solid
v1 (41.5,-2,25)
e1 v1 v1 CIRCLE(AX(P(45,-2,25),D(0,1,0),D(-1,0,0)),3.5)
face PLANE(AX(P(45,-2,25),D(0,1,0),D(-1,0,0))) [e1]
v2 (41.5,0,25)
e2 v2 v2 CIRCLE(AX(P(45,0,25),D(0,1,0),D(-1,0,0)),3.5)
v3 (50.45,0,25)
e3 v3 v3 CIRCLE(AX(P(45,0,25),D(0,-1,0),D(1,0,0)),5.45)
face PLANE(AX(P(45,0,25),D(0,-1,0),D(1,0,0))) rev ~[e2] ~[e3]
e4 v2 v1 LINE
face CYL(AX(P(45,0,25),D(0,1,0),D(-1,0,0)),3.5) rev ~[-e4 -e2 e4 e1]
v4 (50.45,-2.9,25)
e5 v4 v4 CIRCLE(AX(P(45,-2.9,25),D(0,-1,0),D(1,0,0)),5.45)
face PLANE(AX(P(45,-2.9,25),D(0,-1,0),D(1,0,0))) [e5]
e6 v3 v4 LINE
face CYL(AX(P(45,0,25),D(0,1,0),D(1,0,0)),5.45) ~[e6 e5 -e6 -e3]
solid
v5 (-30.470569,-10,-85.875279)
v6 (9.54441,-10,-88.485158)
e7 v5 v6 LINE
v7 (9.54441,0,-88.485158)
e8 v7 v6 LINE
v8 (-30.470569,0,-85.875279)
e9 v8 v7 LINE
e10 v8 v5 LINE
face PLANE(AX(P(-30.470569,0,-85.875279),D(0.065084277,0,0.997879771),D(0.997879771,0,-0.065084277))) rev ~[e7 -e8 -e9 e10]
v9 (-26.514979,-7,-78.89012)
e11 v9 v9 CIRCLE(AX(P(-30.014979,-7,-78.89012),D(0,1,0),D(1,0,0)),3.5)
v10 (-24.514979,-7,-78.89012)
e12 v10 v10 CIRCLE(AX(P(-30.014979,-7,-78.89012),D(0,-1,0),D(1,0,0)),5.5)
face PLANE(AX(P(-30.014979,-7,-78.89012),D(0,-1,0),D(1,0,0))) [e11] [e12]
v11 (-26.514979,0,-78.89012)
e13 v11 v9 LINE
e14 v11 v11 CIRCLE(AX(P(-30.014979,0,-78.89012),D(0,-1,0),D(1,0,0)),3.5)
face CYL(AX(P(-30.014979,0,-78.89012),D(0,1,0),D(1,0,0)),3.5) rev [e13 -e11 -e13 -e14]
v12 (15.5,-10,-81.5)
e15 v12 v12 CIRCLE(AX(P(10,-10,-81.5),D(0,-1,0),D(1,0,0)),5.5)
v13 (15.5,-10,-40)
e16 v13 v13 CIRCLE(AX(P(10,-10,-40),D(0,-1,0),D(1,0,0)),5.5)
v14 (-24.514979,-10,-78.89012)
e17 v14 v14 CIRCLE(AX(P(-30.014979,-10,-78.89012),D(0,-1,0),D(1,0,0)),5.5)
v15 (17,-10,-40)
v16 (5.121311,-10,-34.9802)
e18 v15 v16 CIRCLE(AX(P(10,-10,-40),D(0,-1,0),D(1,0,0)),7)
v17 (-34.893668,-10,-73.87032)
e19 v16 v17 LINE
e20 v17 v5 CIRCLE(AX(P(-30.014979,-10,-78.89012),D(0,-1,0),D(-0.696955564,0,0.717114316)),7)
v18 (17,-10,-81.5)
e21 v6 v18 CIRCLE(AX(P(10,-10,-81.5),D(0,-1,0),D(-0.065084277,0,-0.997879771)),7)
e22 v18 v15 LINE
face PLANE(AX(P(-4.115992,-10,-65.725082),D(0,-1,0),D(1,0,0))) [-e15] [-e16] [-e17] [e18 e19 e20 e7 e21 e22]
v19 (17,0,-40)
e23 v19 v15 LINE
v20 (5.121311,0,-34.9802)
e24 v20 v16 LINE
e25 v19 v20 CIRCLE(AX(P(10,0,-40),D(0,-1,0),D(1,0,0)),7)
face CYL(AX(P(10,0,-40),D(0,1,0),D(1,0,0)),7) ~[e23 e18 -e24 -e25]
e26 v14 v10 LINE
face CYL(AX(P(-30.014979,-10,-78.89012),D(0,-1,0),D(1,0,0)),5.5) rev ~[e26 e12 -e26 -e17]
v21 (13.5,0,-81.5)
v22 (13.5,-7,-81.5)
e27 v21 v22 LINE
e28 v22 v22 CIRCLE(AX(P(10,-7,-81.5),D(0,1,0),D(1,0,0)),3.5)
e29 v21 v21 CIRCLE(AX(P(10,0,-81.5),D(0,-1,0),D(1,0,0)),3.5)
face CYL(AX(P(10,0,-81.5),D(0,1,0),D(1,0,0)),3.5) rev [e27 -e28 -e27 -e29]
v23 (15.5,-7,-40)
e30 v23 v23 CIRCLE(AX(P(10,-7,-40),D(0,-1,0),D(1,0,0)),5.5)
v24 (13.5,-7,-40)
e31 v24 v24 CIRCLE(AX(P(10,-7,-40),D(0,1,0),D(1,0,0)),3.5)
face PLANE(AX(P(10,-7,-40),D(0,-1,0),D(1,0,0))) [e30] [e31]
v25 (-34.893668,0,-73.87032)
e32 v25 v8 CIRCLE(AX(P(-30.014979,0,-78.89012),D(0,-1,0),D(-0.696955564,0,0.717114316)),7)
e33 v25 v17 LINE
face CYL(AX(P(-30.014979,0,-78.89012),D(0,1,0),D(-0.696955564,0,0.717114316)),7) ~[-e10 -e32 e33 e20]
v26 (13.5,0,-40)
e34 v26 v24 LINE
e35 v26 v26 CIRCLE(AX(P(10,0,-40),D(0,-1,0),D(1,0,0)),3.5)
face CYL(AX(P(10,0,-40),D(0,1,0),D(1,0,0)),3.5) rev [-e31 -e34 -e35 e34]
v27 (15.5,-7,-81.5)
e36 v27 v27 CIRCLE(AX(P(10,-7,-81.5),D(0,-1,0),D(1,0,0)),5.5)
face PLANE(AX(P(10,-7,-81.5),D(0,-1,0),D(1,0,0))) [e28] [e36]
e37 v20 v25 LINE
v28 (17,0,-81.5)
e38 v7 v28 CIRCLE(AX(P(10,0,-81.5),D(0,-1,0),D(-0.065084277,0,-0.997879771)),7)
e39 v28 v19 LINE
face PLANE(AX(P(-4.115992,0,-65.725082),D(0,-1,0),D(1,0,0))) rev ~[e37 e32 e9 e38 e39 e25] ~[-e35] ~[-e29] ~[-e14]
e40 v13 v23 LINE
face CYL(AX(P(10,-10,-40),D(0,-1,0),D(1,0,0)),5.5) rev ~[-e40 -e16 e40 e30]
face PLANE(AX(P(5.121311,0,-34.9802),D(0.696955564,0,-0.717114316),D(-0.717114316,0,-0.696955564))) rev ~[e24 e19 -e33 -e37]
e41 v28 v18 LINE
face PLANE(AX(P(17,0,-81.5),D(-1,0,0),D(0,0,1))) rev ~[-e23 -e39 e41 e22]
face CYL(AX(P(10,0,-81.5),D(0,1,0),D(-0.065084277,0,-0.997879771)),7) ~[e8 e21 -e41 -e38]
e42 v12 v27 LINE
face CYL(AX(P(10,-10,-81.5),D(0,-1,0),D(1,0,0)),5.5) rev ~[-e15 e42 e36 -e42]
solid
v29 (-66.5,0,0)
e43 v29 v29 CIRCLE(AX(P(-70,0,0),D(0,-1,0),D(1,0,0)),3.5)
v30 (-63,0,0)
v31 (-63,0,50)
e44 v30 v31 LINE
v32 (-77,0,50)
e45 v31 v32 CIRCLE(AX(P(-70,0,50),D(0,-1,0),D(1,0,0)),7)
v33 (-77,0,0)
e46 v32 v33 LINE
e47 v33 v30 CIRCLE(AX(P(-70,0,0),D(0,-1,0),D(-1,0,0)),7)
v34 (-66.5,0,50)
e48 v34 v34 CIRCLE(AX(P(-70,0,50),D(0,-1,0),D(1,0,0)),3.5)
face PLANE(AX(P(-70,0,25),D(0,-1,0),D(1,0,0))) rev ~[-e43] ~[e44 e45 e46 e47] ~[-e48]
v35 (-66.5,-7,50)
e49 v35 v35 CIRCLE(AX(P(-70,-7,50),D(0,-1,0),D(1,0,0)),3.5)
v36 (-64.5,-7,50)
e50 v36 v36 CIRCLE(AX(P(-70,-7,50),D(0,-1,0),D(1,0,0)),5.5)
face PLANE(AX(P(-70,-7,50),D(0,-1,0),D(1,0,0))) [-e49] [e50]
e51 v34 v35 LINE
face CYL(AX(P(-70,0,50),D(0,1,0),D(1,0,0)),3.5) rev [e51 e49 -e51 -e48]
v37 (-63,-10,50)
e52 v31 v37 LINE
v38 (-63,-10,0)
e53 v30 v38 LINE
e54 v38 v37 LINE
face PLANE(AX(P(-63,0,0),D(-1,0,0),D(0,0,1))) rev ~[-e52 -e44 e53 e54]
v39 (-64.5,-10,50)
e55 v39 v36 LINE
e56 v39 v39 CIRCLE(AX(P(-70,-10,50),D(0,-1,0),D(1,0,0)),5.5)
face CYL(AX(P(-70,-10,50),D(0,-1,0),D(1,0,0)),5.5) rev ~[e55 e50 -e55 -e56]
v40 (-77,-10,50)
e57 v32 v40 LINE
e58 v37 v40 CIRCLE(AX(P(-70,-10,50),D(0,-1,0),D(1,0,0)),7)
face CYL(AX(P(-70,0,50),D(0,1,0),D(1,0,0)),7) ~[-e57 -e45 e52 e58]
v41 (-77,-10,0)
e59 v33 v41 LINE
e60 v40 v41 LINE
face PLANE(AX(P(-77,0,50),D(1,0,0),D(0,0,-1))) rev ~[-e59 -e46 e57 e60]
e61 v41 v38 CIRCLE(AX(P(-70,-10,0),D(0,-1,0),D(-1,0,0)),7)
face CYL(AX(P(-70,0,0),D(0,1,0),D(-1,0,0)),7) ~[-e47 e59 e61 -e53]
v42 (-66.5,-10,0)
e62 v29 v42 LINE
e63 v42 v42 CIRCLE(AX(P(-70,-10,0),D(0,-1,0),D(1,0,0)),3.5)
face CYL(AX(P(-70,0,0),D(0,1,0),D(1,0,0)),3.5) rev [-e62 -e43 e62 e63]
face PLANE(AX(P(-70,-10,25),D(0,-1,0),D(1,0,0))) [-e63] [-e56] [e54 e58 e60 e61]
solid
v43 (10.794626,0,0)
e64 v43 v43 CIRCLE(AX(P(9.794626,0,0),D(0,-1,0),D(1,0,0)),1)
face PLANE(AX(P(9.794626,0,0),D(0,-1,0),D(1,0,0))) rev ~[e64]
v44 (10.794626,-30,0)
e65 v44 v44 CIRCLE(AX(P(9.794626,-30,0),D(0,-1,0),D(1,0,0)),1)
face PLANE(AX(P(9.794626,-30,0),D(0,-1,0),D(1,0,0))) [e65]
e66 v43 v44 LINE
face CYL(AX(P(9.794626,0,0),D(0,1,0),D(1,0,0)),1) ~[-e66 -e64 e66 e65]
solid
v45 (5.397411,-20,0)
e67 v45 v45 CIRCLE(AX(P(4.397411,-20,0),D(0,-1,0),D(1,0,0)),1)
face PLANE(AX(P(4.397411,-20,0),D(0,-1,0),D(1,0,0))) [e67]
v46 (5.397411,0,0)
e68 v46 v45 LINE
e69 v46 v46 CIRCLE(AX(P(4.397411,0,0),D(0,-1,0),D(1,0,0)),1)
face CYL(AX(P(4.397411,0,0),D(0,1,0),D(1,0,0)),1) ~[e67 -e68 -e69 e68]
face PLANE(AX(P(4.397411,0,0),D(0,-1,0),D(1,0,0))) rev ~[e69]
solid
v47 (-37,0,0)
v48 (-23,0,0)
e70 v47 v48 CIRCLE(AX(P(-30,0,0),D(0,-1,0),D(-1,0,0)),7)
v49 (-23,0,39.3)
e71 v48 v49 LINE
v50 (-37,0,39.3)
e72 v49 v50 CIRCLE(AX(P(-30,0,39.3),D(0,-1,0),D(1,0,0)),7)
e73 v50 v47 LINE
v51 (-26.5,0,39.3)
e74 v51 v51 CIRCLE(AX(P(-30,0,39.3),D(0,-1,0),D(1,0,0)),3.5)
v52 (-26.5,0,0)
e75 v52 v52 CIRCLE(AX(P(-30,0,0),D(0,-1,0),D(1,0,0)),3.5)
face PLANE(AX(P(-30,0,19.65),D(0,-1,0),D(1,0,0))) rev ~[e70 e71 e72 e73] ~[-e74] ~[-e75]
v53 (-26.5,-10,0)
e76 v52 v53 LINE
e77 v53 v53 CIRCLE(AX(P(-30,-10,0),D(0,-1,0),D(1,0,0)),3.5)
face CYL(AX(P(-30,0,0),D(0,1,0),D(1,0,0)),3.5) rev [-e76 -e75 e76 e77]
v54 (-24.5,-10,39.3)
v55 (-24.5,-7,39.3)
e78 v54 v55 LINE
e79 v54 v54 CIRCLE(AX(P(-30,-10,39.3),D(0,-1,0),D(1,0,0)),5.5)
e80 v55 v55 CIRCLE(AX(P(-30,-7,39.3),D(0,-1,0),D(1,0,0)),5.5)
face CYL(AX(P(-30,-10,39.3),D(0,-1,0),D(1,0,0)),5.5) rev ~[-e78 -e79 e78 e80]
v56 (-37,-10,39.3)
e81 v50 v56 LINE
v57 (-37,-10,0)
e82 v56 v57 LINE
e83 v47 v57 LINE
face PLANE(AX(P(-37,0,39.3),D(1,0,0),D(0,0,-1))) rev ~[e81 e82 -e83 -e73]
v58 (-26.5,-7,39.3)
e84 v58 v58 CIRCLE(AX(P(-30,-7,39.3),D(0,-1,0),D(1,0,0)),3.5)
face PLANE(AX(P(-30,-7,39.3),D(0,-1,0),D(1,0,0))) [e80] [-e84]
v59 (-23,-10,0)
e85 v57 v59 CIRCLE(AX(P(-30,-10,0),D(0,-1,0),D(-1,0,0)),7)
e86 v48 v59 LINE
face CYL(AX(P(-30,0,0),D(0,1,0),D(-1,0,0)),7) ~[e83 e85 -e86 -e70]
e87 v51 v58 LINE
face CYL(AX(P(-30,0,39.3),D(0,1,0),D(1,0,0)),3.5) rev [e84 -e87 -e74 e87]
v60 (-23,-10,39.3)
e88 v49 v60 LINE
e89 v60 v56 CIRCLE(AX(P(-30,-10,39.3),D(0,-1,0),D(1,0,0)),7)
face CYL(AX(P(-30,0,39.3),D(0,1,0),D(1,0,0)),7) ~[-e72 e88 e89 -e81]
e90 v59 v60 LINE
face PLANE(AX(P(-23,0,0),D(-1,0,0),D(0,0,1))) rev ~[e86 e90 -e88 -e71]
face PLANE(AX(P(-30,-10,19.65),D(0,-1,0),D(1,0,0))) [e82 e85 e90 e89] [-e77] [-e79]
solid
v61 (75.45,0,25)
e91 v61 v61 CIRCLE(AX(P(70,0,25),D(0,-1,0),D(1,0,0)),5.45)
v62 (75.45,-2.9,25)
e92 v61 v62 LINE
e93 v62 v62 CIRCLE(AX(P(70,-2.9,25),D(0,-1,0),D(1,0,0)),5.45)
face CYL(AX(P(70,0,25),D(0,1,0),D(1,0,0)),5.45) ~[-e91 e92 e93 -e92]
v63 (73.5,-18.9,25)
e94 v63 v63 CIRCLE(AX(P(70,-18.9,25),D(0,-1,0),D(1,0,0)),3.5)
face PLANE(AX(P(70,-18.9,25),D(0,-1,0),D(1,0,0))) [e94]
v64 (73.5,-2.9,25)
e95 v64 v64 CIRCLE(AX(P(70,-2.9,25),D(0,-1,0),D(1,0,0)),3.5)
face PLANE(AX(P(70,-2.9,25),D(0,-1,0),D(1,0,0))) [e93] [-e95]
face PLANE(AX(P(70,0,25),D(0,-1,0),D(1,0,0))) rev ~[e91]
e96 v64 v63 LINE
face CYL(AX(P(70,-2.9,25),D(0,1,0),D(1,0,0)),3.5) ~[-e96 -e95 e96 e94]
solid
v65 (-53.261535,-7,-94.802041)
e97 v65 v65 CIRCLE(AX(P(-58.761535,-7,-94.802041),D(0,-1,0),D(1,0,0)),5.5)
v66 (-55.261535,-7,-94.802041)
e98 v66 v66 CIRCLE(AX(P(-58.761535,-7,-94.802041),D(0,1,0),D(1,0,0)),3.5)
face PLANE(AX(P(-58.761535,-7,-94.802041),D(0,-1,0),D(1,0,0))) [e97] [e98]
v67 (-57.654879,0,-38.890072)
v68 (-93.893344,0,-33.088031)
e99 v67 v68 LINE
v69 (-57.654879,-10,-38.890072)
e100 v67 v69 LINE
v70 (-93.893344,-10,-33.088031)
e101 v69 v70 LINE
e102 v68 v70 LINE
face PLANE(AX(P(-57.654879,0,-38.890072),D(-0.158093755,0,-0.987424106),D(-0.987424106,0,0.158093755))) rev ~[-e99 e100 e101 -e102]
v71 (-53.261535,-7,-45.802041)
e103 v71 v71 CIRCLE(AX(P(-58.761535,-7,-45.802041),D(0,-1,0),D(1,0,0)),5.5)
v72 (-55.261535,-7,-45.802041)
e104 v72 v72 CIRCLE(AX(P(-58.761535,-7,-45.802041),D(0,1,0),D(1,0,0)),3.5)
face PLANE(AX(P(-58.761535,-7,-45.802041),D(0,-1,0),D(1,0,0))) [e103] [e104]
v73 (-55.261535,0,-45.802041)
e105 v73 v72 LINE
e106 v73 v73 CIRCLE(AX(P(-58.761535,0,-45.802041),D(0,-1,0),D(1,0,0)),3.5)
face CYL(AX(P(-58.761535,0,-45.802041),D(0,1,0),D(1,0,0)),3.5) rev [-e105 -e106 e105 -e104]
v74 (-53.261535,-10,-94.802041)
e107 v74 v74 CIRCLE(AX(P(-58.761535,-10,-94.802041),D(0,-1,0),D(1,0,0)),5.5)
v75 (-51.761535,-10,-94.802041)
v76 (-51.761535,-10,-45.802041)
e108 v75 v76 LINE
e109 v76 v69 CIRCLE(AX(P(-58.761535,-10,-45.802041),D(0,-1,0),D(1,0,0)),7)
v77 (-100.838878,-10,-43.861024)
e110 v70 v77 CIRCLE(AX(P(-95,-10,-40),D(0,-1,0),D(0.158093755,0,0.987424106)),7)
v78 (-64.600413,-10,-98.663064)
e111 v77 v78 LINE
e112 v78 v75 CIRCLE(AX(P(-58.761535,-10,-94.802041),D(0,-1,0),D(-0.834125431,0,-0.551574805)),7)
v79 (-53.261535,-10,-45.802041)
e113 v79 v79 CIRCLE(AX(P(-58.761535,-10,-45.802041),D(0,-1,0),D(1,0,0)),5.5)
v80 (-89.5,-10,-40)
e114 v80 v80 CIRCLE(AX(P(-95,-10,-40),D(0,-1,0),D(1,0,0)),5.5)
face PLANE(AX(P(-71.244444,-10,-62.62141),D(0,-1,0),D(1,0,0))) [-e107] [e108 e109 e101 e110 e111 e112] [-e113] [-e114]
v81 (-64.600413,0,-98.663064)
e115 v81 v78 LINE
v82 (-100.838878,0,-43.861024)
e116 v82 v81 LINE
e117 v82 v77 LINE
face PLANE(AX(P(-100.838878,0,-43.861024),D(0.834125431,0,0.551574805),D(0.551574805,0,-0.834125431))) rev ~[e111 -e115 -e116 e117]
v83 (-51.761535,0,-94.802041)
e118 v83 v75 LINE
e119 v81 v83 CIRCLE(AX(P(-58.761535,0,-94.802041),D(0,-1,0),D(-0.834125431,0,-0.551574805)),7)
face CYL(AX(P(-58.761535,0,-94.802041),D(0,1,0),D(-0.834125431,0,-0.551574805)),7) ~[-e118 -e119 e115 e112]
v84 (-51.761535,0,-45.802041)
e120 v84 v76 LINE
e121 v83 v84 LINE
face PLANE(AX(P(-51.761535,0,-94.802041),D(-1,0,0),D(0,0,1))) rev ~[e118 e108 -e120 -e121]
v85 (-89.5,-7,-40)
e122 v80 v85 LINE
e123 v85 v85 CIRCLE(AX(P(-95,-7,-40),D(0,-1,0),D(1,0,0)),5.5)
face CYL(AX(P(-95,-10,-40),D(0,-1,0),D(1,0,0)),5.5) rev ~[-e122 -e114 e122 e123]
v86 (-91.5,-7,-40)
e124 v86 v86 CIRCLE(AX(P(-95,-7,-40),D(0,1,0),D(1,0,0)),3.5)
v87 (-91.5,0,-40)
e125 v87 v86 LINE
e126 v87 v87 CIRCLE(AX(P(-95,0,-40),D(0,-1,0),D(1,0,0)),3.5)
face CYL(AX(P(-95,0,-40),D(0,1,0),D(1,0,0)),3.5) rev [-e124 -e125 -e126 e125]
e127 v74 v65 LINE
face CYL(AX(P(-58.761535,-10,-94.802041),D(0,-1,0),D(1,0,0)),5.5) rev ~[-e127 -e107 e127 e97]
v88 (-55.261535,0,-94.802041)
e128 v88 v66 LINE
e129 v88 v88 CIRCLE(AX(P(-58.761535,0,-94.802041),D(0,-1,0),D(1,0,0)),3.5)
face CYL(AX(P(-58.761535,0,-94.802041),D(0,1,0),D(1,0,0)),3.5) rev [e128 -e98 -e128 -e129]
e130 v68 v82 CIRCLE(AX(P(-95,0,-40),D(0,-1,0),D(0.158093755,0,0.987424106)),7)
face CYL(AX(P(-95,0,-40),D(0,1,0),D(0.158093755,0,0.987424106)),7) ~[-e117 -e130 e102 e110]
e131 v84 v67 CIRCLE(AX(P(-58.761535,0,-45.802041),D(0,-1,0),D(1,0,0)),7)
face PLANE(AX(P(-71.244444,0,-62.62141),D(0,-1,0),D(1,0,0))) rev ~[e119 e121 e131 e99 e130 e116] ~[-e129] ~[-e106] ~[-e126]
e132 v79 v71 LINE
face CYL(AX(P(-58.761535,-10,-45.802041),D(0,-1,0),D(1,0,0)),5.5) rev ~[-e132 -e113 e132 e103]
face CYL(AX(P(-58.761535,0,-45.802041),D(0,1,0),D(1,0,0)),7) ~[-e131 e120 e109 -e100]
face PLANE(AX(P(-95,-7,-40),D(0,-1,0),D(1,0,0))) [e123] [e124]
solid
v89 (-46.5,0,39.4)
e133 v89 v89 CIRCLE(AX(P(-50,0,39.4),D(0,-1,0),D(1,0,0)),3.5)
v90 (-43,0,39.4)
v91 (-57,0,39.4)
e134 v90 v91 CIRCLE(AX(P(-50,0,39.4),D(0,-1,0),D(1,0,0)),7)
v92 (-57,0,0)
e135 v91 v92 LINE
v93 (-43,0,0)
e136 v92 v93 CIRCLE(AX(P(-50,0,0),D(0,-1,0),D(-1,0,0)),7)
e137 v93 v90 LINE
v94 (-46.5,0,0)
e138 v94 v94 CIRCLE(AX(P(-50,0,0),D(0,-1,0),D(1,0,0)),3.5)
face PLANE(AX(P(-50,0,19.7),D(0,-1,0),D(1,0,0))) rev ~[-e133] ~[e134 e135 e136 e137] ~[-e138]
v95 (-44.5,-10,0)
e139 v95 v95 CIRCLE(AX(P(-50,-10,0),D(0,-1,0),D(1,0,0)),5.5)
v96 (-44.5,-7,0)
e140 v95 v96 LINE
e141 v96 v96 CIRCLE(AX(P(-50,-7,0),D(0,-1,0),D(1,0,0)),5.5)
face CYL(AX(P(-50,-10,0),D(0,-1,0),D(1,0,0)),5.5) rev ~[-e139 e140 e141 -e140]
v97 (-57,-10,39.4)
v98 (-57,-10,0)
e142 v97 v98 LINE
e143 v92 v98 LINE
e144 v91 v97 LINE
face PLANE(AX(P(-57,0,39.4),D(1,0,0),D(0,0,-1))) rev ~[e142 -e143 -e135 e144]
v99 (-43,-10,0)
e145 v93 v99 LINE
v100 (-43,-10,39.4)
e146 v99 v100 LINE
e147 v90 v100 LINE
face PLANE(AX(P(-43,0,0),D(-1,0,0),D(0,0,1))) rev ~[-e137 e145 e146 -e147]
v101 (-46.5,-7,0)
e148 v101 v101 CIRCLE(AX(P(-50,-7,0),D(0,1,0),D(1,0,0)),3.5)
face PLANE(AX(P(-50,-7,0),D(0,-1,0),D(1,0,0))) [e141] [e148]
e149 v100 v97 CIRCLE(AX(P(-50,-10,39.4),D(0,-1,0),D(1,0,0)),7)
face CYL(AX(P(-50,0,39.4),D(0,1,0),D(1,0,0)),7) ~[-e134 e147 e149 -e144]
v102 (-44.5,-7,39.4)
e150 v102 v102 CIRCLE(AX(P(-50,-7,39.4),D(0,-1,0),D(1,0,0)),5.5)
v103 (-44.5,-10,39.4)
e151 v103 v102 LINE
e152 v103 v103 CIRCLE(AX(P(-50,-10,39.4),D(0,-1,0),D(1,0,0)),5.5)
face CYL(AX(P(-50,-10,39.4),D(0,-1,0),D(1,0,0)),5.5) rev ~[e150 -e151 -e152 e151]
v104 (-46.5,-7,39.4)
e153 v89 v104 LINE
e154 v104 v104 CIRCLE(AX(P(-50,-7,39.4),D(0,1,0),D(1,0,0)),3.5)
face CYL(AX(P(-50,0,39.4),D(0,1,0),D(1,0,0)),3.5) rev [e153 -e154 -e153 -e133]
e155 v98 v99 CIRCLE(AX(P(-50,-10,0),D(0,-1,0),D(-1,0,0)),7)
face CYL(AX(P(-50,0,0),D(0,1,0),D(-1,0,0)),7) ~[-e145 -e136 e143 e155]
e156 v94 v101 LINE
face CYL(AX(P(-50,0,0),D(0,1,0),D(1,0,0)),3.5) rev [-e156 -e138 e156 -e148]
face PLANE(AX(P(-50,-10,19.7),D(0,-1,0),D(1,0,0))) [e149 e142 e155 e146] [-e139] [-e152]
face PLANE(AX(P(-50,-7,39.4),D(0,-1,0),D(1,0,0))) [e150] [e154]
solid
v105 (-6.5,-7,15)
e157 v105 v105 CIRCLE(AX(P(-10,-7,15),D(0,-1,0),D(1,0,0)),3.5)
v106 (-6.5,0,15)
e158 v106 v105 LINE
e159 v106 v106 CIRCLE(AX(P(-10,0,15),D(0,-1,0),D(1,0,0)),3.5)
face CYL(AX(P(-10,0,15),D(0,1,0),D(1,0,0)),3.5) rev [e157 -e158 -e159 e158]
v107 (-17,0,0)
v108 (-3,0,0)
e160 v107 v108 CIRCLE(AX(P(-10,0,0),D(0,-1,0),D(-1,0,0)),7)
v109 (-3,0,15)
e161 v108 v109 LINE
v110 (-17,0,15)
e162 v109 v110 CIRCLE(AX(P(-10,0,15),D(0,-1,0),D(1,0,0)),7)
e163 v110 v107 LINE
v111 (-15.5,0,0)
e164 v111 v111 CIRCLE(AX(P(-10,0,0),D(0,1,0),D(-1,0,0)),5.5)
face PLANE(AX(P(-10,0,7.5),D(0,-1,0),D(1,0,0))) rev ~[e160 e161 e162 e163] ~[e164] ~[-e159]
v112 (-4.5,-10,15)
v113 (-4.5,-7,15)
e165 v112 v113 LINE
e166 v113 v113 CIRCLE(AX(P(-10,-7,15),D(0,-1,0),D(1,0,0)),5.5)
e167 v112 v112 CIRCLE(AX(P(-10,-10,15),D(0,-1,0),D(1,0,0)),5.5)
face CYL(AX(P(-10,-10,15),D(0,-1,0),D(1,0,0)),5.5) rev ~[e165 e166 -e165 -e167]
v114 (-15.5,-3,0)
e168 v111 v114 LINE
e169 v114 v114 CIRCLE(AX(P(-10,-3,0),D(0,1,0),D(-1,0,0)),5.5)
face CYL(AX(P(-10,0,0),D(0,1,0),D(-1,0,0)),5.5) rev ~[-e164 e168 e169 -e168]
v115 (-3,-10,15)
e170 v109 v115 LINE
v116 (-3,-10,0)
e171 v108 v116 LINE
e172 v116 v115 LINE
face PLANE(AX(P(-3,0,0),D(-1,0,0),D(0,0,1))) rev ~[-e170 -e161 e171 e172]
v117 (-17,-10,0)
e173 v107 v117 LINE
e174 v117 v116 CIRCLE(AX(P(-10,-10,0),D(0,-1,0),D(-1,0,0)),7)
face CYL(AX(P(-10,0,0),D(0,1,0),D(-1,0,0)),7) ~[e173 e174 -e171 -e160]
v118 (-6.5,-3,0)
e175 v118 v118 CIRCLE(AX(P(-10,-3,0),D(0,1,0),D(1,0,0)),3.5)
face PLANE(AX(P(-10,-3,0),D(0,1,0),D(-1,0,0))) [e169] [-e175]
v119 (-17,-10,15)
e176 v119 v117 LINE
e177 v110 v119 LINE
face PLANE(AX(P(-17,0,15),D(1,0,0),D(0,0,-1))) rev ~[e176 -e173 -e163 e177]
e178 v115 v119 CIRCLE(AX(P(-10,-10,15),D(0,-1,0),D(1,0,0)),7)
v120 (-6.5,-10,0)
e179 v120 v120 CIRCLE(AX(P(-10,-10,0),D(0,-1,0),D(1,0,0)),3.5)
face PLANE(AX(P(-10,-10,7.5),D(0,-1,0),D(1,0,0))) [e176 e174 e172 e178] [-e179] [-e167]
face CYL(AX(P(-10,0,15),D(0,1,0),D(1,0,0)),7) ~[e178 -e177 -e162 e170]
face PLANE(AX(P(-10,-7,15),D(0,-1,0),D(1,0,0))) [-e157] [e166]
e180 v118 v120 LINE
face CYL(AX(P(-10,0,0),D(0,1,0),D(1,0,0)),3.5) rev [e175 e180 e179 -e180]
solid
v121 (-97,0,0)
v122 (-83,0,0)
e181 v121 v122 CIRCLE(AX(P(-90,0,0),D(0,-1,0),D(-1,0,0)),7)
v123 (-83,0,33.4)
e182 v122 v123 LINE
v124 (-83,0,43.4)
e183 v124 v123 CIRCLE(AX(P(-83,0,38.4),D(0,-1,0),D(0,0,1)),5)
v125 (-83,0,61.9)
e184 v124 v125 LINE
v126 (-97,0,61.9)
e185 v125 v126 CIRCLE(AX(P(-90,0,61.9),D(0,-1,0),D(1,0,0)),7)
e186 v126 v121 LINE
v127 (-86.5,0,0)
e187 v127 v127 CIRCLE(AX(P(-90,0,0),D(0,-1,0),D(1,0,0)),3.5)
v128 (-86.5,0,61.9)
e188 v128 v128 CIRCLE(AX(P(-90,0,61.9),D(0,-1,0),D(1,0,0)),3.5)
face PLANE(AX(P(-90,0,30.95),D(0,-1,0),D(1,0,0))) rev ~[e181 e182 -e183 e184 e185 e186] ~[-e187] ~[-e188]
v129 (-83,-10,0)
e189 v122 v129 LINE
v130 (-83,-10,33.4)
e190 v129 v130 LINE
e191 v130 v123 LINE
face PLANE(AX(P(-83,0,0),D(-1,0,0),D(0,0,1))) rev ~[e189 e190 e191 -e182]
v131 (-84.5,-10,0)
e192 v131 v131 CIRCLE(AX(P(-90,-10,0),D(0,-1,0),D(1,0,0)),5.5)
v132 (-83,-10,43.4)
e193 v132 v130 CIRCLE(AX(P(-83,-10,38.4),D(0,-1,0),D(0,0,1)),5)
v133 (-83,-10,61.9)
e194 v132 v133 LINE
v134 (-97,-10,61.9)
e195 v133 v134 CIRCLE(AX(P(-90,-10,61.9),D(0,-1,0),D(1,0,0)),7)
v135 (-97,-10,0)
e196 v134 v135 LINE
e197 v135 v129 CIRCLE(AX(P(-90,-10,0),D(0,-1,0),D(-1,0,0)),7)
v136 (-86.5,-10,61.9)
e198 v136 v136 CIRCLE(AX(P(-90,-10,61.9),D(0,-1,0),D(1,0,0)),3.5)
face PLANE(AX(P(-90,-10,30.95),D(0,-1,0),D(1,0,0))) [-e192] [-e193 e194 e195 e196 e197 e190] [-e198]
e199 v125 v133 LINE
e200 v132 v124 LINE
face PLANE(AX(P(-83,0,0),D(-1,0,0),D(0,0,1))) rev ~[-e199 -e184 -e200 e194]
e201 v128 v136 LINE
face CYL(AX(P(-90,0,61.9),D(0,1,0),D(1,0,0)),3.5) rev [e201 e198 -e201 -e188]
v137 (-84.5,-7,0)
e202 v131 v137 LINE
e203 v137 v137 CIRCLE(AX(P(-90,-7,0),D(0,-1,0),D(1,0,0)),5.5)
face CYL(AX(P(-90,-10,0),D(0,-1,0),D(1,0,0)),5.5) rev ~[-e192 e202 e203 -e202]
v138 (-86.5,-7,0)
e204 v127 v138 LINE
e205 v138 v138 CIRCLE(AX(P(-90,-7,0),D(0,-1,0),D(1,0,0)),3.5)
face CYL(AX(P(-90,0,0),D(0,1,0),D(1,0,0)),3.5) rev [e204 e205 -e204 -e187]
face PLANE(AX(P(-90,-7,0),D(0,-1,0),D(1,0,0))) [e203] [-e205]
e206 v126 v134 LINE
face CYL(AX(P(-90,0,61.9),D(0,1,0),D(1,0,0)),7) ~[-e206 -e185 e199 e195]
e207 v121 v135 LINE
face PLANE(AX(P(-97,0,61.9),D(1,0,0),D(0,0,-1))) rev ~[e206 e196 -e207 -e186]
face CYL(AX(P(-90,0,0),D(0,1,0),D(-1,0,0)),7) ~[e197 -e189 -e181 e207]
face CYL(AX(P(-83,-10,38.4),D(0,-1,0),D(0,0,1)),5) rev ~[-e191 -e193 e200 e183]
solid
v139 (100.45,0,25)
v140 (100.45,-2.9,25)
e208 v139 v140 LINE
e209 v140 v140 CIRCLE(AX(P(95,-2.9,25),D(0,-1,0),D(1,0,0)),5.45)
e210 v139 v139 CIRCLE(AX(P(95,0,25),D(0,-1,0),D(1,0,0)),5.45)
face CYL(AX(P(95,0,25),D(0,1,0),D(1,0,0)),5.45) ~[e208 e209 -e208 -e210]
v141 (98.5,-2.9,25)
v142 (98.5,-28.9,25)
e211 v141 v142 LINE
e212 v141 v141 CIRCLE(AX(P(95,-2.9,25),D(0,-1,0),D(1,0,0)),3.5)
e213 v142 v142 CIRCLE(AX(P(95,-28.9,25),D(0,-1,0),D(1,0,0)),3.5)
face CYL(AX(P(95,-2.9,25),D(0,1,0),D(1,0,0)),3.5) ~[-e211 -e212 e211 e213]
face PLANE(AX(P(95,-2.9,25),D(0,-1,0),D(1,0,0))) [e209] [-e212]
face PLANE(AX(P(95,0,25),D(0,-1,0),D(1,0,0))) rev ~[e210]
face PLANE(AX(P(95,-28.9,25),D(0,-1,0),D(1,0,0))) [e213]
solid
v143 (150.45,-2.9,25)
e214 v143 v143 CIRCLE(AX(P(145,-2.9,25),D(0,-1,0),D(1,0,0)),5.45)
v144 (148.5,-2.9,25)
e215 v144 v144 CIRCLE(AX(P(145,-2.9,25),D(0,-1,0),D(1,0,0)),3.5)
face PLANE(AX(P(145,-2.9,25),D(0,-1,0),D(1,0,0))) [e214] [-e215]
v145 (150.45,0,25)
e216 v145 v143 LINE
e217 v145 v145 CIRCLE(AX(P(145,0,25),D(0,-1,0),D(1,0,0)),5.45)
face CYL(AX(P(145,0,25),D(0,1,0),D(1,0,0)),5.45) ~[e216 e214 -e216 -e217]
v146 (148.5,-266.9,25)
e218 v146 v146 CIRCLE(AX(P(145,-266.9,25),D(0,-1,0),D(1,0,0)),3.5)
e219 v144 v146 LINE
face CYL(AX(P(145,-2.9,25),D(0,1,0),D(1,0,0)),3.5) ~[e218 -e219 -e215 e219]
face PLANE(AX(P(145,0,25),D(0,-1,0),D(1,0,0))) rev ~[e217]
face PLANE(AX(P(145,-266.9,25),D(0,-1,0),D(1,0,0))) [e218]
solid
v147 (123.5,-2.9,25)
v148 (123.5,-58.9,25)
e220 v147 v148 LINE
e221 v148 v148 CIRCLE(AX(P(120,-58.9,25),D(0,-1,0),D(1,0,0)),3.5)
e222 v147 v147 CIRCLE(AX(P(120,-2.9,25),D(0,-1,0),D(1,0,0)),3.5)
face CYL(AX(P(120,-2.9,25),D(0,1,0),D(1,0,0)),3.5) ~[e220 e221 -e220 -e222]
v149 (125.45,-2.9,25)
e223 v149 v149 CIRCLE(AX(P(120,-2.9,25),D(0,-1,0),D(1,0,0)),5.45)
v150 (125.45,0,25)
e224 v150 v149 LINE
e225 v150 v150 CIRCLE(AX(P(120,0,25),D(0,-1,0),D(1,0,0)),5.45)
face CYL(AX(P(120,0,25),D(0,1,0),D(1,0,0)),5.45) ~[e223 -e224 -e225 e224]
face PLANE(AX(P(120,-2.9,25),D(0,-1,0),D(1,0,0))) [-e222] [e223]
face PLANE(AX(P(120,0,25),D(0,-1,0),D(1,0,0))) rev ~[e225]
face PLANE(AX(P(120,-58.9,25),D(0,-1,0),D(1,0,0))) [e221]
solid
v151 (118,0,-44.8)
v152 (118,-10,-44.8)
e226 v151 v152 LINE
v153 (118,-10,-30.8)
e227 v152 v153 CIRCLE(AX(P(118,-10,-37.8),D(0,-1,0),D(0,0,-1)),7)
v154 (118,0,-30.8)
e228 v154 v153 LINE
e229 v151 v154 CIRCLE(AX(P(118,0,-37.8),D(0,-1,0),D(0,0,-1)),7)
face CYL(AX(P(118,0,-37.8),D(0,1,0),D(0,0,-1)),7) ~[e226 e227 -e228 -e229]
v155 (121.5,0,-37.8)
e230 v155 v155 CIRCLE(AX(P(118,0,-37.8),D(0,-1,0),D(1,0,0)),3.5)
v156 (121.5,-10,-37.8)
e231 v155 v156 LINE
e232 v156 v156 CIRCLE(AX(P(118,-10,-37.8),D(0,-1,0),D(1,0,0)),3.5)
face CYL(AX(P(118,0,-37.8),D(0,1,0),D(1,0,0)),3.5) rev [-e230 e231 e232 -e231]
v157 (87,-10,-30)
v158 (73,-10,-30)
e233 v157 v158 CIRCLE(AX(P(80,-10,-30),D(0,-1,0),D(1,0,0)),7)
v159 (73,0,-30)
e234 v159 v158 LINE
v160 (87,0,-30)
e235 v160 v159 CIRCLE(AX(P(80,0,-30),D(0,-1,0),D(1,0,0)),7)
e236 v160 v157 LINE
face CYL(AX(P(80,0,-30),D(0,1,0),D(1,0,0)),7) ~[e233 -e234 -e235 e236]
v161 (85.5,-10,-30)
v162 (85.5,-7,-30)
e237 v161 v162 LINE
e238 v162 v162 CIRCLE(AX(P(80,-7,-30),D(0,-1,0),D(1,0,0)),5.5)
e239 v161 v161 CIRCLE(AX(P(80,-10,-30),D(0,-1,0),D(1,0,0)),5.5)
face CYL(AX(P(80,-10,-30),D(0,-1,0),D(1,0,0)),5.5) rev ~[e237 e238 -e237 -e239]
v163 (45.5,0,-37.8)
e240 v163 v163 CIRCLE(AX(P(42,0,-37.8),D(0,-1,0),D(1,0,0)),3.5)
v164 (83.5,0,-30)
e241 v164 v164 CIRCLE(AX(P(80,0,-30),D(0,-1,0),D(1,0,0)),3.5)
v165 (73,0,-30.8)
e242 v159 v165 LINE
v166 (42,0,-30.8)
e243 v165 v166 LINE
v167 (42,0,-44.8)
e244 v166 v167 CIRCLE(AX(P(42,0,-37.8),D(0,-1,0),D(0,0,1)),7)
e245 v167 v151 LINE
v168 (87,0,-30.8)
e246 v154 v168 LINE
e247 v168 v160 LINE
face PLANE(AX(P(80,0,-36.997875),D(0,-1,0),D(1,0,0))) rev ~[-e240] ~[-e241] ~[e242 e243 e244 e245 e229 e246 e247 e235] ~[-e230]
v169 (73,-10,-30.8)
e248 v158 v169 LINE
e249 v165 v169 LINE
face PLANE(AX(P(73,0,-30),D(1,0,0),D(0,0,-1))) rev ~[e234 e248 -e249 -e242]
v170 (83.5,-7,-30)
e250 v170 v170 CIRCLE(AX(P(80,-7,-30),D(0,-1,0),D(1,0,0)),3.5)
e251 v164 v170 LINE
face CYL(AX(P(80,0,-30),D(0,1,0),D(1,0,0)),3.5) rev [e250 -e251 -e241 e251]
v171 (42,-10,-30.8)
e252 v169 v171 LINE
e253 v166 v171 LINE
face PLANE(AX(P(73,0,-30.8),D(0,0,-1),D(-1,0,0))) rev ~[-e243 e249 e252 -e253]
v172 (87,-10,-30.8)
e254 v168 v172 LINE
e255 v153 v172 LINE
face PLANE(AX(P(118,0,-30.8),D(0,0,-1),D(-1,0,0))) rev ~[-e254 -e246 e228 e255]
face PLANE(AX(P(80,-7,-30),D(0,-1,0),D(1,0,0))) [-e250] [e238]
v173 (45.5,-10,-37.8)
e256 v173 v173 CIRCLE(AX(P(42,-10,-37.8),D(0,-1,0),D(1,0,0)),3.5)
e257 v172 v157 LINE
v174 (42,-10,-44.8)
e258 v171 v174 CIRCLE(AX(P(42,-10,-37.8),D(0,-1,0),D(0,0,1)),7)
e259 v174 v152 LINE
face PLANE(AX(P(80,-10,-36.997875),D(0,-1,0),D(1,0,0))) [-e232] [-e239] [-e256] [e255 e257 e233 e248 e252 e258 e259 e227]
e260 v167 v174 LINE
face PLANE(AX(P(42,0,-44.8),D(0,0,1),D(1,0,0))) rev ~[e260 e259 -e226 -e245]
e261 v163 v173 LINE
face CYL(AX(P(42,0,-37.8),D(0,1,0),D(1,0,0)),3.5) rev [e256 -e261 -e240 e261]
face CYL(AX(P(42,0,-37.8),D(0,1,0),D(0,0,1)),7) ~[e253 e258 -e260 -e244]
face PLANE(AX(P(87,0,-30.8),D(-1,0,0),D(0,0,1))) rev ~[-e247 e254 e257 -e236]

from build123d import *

# Parameters (mm, degrees)
F1_R      = 3.5
F2_DEPTH  = 10
F3_R      = 1
F4_DEPTH  = 20
F5_DEPTH  = 30
F7_DEPTH  = 10
F10_R     = 5.5
F10_R_2   = 3.5
F11_DEPTH = 3
F12_R     = 5.5
F12_R_2   = 3.5
F13_DEPTH = 3
F14_R     = 5.5
F14_R_2   = 3.5
F15_DEPTH = 3
F16_R     = 5.5
F17_DEPTH = 3
F18_R     = 5.5
F19_DEPTH = 3
F20_R     = 5.5
F20_R_2   = 3.5
F21_DEPTH = 3
F22_R     = 5.5
F23_DEPTH = 3
F24_R     = 5.45
F25_DEPTH = 2.9
F26_R     = 3.5
F27_DEPTH = 16
F28_DEPTH = 26
F29_DEPTH = 56
F30_DEPTH = 264
F31_R     = 5.5
F31_R_2   = 3.5
F32_DEPTH = 3
F33_R     = 5.5
F33_R_2   = 3.5
F34_DEPTH = 3
F35_R     = 3.5
F36_DEPTH = 2


# Not quite as in the source:
# - a feature names something its author has since deleted; it is built from what else it names


with BuildPart() as f2:
    # F1 (on Front) → F2 (new body)
    with BuildSketch(Plane.XZ):
        with BuildLine():
            Line((17, -81.5), (17, -40))
            ThreePointArc((17, -40), (12.7248098424, -33.5521002394), (5.1213110507, -34.9801997913))
            Line((5.1213110507, -34.9801997913), (-34.8936677561, -73.8703202732))
            ThreePointArc((-34.8936677561, -73.8703202732), (-36.5833416613, -81.3101637481), (-30.4705687475, -85.8752788771))
            Line((-30.4705687475, -85.8752788771), (9.5444100592, -88.4851583952))
            ThreePointArc((9.5444100592, -88.4851583952), (14.7859623073, -86.6082839382), (17, -81.5))
        make_face()
        with Locations((10, -81.5)):
            Circle(F1_R, mode=Mode.SUBTRACT)
        with Locations((-30.0149788067, -78.8901204819)):
            Circle(F1_R, mode=Mode.SUBTRACT)
        with Locations((10, -40)):
            Circle(F1_R, mode=Mode.SUBTRACT)
    extrude(amount=F2_DEPTH)

    # F16 (on face) → F17 (cut)
    with BuildSketch(Plane.XZ.offset(10)):
        with Locations((10, -40)):
            Circle(F16_R)
        with Locations((10, -81.5)):
            Circle(F16_R)
        with Locations((-30.0149788067, -78.8901204819)):
            Circle(F16_R)
    extrude(amount=-F17_DEPTH, mode=Mode.SUBTRACT)


with BuildPart() as f2b:
    # F1 (on Front) → F2, piece 2 (new body)
    with BuildSketch(Plane.XZ):
        with BuildLine():
            Line((-57.6548790335, -38.8900720763), (-93.8933437135, -33.0880312599))
            ThreePointArc((-93.8933437135, -33.0880312599), (-100.8832662527, -36.2069566045), (-100.838878017, -43.8610236341))
            Line((-100.838878017, -43.8610236341), (-64.6004133369, -98.6630644504))
            ThreePointArc((-64.6004133369, -98.6630644504), (-56.7456169336, -101.5054782226), (-51.76153532, -94.8020408163))
            Line((-51.76153532, -94.8020408163), (-51.76153532, -45.8020408163))
            ThreePointArc((-51.76153532, -45.8020408163), (-53.4348762354, -41.2603777952), (-57.6548790335, -38.8900720763))
        make_face()
        with Locations((-58.76153532, -94.8020408163)):
            Circle(F1_R, mode=Mode.SUBTRACT)
        with Locations((-95, -40)):
            Circle(F1_R, mode=Mode.SUBTRACT)
        with Locations((-58.76153532, -45.8020408163)):
            Circle(F1_R, mode=Mode.SUBTRACT)
    extrude(amount=F2_DEPTH)

    # F18 (on face) → F19 (cut)
    with BuildSketch(Plane.XZ.offset(10)):
        with Locations((-58.76153532, -45.8020408163)):
            Circle(F18_R)
        with Locations((-95, -40)):
            Circle(F18_R)
        with Locations((-58.76153532, -94.8020408163)):
            Circle(F18_R)
    extrude(amount=-F19_DEPTH, mode=Mode.SUBTRACT)


with BuildPart() as f2c:
    # F1 (on Front) → F2, piece 3 (new body)
    with BuildSketch(Plane.XZ):
        with BuildLine():
            Line((-97, 61.9), (-97, 0))
            ThreePointArc((-97, 0), (-90, -7), (-83, 0))
            Line((-83, 0), (-83, 61.9))
            ThreePointArc((-83, 61.9), (-90, 68.9), (-97, 61.9))
        make_face()
        with Locations((-90, 0)):
            Circle(F1_R, mode=Mode.SUBTRACT)
        with Locations((-90, 61.9)):
            Circle(F1_R, mode=Mode.SUBTRACT)
    extrude(amount=F2_DEPTH)

    # F6 (on face) → F7 (cut, through all)
    with BuildSketch(Plane.XZ.offset(10)):
        with BuildLine():
            Line((-83, 33.4), (-83, 43.4))
            ThreePointArc((-83, 43.4), (-88, 38.4), (-83, 33.4))
        make_face()
    extrude(amount=-F7_DEPTH, mode=Mode.SUBTRACT)

    # F20 (on face) → F21 (cut)
    with BuildSketch(Plane.XZ.offset(10)):
        with Locations((-90, 0)):
            Circle(F20_R)
        with Locations((-90, 0)):
            Circle(F20_R_2, mode=Mode.SUBTRACT)
    extrude(amount=-F21_DEPTH, mode=Mode.SUBTRACT)


with BuildPart() as f2d:
    # F1 (on Front) → F2, piece 4 (new body)
    with BuildSketch(Plane.XZ):
        with BuildLine():
            Line((-77, 50), (-77, 0))
            ThreePointArc((-77, 0), (-70, -7), (-63, 0))
            Line((-63, 0), (-63, 50))
            ThreePointArc((-63, 50), (-70, 57), (-77, 50))
        make_face()
        with Locations((-70, 0)):
            Circle(F1_R, mode=Mode.SUBTRACT)
        with Locations((-70, 50)):
            Circle(F1_R, mode=Mode.SUBTRACT)
    extrude(amount=F2_DEPTH)

    # F14 (on face) → F15 (cut)
    with BuildSketch(Plane.XZ.offset(10)):
        with Locations((-70, 50)):
            Circle(F14_R)
        with Locations((-70, 50)):
            Circle(F14_R_2, mode=Mode.SUBTRACT)
    extrude(amount=-F15_DEPTH, mode=Mode.SUBTRACT)


with BuildPart() as f2e:
    # F1 (on Front) → F2, piece 5 (new body)
    with BuildSketch(Plane.XZ):
        with BuildLine():
            Line((-57, 39.4), (-57, 0))
            ThreePointArc((-57, 0), (-50, -7), (-43, 0))
            Line((-43, 0), (-43, 39.4))
            ThreePointArc((-43, 39.4), (-50, 46.4), (-57, 39.4))
        make_face()
        with Locations((-50, 0)):
            Circle(F1_R, mode=Mode.SUBTRACT)
        with Locations((-50, 39.4)):
            Circle(F1_R, mode=Mode.SUBTRACT)
    extrude(amount=F2_DEPTH)

    # F22 (on face) → F23 (cut)
    with BuildSketch(Plane.XZ.offset(10)):
        with Locations((-50, 39.4)):
            Circle(F22_R)
        with Locations((-50, 0)):
            Circle(F22_R)
    extrude(amount=-F23_DEPTH, mode=Mode.SUBTRACT)


with BuildPart() as f2f:
    # F1 (on Front) → F2, piece 6 (new body)
    with BuildSketch(Plane.XZ):
        with BuildLine():
            Line((-37, 39.3), (-37, 0))
            ThreePointArc((-37, 0), (-30, -7), (-23, 0))
            Line((-23, 0), (-23, 39.3))
            ThreePointArc((-23, 39.3), (-30, 46.3), (-37, 39.3))
        make_face()
        with Locations((-30, 0)):
            Circle(F1_R, mode=Mode.SUBTRACT)
        with Locations((-30, 39.3)):
            Circle(F1_R, mode=Mode.SUBTRACT)
    extrude(amount=F2_DEPTH)

    # F31 (on face) → F32 (cut)
    with BuildSketch(Plane.XZ.offset(10)):
        with Locations((-30, 39.3)):
            Circle(F31_R)
        with Locations((-30, 39.3)):
            Circle(F31_R_2, mode=Mode.SUBTRACT)
    extrude(amount=-F32_DEPTH, mode=Mode.SUBTRACT)


with BuildPart() as f2g:
    # F1 (on Front) → F2, piece 7 (new body)
    with BuildSketch(Plane.XZ):
        with BuildLine():
            Line((73, -30.8), (42, -30.8))
            ThreePointArc((42, -30.8), (35, -37.8), (42, -44.8))
            Line((42, -44.8), (118, -44.8))
            ThreePointArc((118, -44.8), (125, -37.8), (118, -30.8))
            Line((118, -30.8), (87, -30.8))
            Line((87, -30.8), (87, -30))
            ThreePointArc((87, -30), (80, -23), (73, -30))
            Line((73, -30), (73, -30.8))
        make_face()
        with Locations((42, -37.8)):
            Circle(F1_R, mode=Mode.SUBTRACT)
        with Locations((118, -37.8)):
            Circle(F1_R, mode=Mode.SUBTRACT)
        with Locations((80, -30)):
            Circle(F1_R, mode=Mode.SUBTRACT)
    extrude(amount=F2_DEPTH)

    # F33 (on face) → F34 (cut)
    with BuildSketch(Plane.XZ.offset(10)):
        with Locations((80, -30)):
            Circle(F33_R)
        with Locations((80, -30)):
            Circle(F33_R_2, mode=Mode.SUBTRACT)
    extrude(amount=-F34_DEPTH, mode=Mode.SUBTRACT)


with BuildPart() as f2h:
    # F1 (on Front) → F2, piece 8 (new body)
    with BuildSketch(Plane.XZ):
        with BuildLine():
            Line((-3, 0), (-3, 15))
            ThreePointArc((-3, 15), (-10, 22), (-17, 15))
            Line((-17, 15), (-17, 0))
            ThreePointArc((-17, 0), (-10, -7), (-3, 0))
        make_face()
        with Locations((-10, 0)):
            Circle(F1_R, mode=Mode.SUBTRACT)
        with Locations((-10, 15)):
            Circle(F1_R, mode=Mode.SUBTRACT)
    extrude(amount=F2_DEPTH)

    # F10 (on face) → F11 (cut)
    with BuildSketch(Plane.XZ.offset(10)):
        with Locations((-10, 15)):
            Circle(F10_R)
        with Locations((-10, 15)):
            Circle(F10_R_2, mode=Mode.SUBTRACT)
    extrude(amount=-F11_DEPTH, mode=Mode.SUBTRACT)

    # F12 (on face) → F13 (cut)
    with BuildSketch(Plane(origin=(0, 0, 0), x_dir=(-1, 0, 0), z_dir=(0, 1, 0))):
        with Locations((10, 0)):
            Circle(F12_R)
        with Locations((10, 0)):
            Circle(F12_R_2, mode=Mode.SUBTRACT)
    extrude(amount=-F13_DEPTH, mode=Mode.SUBTRACT)


with BuildPart() as f4:
    # F3 (on Front) → F4 (new body)
    with BuildSketch(Plane.XZ):
        with Locations((4.3974108437, 0)):
            Circle(F3_R)
    extrude(amount=F4_DEPTH)


with BuildPart() as f5:
    # F3 (on Front) → F5 (new body)
    with BuildSketch(Plane.XZ):
        with Locations((9.7946263296, 0)):
            Circle(F3_R)
    extrude(amount=F5_DEPTH)


with BuildPart() as f25:
    # F24 (on Front) → F25 (new body)
    with BuildSketch(Plane.XZ):
        with Locations((45, 25)):
            Circle(F24_R)
    extrude(amount=F25_DEPTH)

    # F35 (on face) → F36 (cut)
    with BuildSketch(Plane(origin=(0, 0, 0), x_dir=(-1, 0, 0), z_dir=(0, 1, 0))):
        with Locations((-45, 25)):
            Circle(F35_R)
    extrude(amount=-F36_DEPTH, mode=Mode.SUBTRACT)


with BuildPart() as f25b:
    # F24 (on Front) → F25, piece 2 (new body)
    with BuildSketch(Plane.XZ):
        with Locations((70, 25)):
            Circle(F24_R)
    extrude(amount=F25_DEPTH)

    # F26 (on face) → F27 (join)
    with BuildSketch(Plane.XZ.offset(2.9)):
        with Locations((70, 25)):
            Circle(F26_R)
    extrude(amount=F27_DEPTH)


with BuildPart() as f25c:
    # F24 (on Front) → F25, piece 3 (new body)
    with BuildSketch(Plane.XZ):
        with Locations((95, 25)):
            Circle(F24_R)
    extrude(amount=F25_DEPTH)

    # F26 (on face) → F28 (join)
    with BuildSketch(Plane.XZ.offset(2.9)):
        with Locations((95, 25)):
            Circle(F26_R)
    extrude(amount=F28_DEPTH)


with BuildPart() as f25d:
    # F24 (on Front) → F25, piece 4 (new body)
    with BuildSketch(Plane.XZ):
        with Locations((120, 25)):
            Circle(F24_R)
    extrude(amount=F25_DEPTH)

    # F26 (on face) → F29 (join)
    with BuildSketch(Plane.XZ.offset(2.9)):
        with Locations((120, 25)):
            Circle(F26_R)
    extrude(amount=F29_DEPTH)


with BuildPart() as f25e:
    # F24 (on Front) → F25, piece 5 (new body)
    with BuildSketch(Plane.XZ):
        with Locations((145, 25)):
            Circle(F24_R)
    extrude(amount=F25_DEPTH)

    # F26 (on face) → F30 (join)
    with BuildSketch(Plane.XZ.offset(2.9)):
        with Locations((145, 25)):
            Circle(F26_R)
    extrude(amount=F30_DEPTH)


solid = Compound([f2.part, f2b.part, f2c.part, f2d.part, f2e.part, f2f.part, f2g.part, f2h.part, f4.part, f5.part, f25.part, f25b.part, f25c.part, f25d.part, f25e.part])
